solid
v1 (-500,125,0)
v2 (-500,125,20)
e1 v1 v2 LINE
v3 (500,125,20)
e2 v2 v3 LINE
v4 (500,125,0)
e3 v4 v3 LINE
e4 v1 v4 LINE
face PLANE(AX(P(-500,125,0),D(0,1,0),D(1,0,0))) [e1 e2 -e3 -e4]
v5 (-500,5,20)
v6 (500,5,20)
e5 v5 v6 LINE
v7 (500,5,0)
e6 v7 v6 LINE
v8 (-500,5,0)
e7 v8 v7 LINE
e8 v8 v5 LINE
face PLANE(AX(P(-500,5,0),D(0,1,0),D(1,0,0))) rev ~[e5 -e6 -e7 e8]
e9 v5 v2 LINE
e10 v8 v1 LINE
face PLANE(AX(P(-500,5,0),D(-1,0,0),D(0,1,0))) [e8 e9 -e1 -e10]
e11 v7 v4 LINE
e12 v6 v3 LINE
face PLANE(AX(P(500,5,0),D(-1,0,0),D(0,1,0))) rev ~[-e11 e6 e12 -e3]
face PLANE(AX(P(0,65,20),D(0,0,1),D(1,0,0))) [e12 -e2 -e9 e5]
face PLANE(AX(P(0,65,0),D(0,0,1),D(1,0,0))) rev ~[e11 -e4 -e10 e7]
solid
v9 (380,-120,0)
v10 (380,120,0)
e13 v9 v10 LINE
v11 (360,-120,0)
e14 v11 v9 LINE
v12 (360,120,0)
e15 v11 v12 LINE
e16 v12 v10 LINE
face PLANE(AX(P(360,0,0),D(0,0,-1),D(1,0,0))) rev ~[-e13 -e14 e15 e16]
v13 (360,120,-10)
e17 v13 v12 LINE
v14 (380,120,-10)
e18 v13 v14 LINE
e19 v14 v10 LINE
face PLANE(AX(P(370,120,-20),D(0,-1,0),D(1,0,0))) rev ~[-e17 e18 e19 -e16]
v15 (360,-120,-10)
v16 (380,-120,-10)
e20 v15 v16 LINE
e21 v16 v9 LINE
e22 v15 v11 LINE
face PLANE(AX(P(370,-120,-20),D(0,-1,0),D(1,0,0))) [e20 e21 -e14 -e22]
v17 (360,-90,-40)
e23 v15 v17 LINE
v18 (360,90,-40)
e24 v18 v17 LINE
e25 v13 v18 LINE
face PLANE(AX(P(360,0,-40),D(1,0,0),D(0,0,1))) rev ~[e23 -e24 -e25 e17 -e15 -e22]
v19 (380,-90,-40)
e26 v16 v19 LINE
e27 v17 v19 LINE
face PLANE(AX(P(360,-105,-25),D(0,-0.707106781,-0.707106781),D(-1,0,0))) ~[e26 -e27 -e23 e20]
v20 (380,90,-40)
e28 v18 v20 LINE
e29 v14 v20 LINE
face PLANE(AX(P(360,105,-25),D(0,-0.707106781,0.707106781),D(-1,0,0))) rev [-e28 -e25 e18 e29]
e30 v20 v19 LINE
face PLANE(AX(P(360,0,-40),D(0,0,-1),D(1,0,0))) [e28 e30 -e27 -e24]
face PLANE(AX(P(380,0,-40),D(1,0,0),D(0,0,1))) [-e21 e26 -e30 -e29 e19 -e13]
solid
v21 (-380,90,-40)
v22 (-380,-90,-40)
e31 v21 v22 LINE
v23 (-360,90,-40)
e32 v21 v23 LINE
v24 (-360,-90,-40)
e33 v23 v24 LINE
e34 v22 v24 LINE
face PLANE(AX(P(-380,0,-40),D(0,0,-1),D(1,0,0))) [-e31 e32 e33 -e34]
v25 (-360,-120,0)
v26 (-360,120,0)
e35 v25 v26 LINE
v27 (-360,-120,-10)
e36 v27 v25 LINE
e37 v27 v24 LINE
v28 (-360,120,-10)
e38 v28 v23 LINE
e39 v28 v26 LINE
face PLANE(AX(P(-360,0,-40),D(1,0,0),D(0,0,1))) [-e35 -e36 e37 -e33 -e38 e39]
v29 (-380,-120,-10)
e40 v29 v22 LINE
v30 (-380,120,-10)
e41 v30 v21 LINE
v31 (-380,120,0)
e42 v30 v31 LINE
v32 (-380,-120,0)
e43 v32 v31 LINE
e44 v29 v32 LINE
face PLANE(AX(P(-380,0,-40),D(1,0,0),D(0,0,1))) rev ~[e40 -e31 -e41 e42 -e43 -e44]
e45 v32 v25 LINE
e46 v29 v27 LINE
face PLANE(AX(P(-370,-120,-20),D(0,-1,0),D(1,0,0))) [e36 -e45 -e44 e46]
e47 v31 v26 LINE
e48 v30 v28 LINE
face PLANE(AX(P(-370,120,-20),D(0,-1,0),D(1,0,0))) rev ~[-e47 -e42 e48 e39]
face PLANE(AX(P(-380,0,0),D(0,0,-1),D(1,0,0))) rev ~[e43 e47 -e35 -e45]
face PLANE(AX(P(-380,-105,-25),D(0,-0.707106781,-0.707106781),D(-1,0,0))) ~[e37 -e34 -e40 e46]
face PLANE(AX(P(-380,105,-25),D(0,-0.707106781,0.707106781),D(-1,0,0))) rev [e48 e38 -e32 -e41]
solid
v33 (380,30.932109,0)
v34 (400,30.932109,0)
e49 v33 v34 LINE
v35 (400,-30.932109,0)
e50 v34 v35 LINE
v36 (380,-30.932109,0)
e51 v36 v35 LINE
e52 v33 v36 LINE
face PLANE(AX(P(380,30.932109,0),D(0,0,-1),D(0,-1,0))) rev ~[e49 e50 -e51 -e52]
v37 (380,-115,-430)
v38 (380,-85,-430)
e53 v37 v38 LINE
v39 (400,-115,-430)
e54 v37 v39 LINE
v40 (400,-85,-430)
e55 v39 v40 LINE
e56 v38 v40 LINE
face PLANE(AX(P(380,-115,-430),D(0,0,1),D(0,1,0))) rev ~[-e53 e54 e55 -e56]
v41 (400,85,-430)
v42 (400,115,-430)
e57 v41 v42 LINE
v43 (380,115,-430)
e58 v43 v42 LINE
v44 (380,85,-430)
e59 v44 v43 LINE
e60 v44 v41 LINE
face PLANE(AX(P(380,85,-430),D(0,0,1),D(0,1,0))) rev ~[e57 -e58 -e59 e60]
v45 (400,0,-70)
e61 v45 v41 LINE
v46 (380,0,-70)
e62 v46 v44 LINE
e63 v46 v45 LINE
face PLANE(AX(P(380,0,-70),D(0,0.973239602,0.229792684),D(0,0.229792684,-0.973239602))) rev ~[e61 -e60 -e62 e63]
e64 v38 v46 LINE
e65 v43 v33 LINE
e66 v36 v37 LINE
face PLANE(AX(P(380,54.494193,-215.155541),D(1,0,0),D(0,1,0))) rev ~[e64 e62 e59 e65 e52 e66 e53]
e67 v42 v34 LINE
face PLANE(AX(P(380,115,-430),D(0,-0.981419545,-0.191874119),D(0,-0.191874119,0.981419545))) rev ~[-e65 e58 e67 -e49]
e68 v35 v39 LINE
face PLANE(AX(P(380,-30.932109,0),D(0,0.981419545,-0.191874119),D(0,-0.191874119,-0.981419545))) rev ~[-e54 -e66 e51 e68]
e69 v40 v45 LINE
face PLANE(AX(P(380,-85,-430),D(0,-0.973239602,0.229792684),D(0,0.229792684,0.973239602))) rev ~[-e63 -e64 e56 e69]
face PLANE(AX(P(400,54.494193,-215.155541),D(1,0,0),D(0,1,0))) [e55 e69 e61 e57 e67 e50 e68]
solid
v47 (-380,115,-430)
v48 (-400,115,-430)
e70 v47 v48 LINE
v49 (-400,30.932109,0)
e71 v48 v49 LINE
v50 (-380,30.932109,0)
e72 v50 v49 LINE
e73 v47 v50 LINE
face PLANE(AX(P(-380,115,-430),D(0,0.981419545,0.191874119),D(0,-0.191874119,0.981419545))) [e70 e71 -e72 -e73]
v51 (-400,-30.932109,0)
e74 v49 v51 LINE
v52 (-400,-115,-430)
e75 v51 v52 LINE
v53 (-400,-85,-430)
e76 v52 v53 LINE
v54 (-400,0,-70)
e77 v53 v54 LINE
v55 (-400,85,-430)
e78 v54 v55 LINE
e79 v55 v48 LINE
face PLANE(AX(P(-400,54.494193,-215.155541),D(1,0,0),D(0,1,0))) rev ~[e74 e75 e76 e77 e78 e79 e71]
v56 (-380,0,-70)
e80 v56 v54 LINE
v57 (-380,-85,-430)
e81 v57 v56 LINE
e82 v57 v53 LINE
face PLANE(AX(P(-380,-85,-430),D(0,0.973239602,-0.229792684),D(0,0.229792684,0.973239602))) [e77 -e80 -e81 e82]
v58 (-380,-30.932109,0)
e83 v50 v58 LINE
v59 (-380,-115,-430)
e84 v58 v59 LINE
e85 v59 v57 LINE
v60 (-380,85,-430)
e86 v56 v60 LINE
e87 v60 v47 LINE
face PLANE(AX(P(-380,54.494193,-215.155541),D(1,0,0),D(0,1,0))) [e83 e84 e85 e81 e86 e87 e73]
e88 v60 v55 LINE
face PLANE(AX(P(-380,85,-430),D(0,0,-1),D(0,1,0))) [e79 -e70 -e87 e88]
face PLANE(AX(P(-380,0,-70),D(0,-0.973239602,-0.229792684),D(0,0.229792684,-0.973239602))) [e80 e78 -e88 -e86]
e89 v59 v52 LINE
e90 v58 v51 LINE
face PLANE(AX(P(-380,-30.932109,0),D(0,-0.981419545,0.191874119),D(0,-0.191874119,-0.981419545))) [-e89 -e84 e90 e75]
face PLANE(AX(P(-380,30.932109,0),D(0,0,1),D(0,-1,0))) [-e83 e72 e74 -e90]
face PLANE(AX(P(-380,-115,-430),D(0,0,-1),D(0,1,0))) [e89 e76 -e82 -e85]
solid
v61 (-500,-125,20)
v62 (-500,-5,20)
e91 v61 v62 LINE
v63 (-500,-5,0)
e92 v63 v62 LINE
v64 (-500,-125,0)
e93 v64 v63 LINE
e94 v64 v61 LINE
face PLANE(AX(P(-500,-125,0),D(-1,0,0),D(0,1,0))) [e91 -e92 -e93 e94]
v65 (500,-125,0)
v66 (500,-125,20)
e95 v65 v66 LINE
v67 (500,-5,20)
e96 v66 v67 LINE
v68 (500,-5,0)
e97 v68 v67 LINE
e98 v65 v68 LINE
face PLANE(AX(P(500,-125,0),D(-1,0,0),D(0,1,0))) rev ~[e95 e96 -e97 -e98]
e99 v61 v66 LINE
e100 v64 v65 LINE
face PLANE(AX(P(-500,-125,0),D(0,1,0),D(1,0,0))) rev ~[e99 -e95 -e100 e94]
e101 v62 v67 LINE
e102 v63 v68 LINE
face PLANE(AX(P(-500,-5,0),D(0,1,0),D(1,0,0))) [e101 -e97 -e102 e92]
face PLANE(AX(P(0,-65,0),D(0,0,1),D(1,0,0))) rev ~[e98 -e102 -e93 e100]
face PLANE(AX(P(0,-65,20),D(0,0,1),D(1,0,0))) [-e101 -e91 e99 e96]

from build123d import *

# Parameters (mm, degrees)
F0_W      = 1000
F0_H      = 120
F1_DEPTH  = 20
F2_W      = 20
F2_H      = 40
F3_DEPTH  = 120
F5_START  = 380
F5_DEPTH  = 20
F6_START  = -380
F6_DEPTH  = 20
F7_SIZE   = 30
F7_2_SIZE = 30


with BuildPart() as f1:
    # F0 (on Top) → F1 (new body)
    with BuildSketch(Plane.XY):
        with Locations((0, 65)):
            Rectangle(F0_W, F0_H)
    extrude(amount=F1_DEPTH)


with BuildPart() as f1b:
    # F0 (on Top) → F1, piece 2 (new body)
    with BuildSketch(Plane.XY):
        with Locations((0, -65)):
            Rectangle(F0_W, F0_H)
    extrude(amount=F1_DEPTH)


with BuildPart() as f3:
    # F2 (on Front) → F3 (new body, symmetric)
    with BuildSketch(Plane.XZ):
        with Locations((-370, -20)):
            Rectangle(F2_W, F2_H)
    extrude(amount=F3_DEPTH, both=True)

    # F7
    f7_edges = [f3.edges().sort_by_distance(p)[0] for p in [
        (-370, -120, -40),
        (-370, 120, -40),
    ]]
    chamfer(f7_edges, length=F7_SIZE)


with BuildPart() as f3b:
    # F2 (on Front) → F3, piece 2 (new body, symmetric)
    with BuildSketch(Plane.XZ):
        with Locations((370, -20)):
            Rectangle(F2_W, F2_H)
    extrude(amount=F3_DEPTH, both=True)

    # F7#2
    f7_2_edges = [f3b.edges().sort_by_distance(p)[0] for p in [
        (370, -120, -40),
        (370, 120, -40),
    ]]
    chamfer(f7_2_edges, length=F7_2_SIZE)


with BuildPart() as f5:
    # F4 (on Right) → F5 (new body)
    with BuildSketch(Plane.YZ.offset(F5_START)):
        Polygon((30.9321093395, 0), (0, 0), (0, -70), (85, -430), (115, -430), align=None)
        Polygon((0, -70), (0, 0), (-30.9321093395, 0), (-115, -430), (-85, -430), align=None)
    extrude(amount=F5_DEPTH)


with BuildPart() as f6:
    # F4 (on Right) → F6 (new body)
    with BuildSketch(Plane.YZ.offset(F6_START)):
        Polygon((30.9321093395, 0), (0, 0), (0, -70), (85, -430), (115, -430), align=None)
        Polygon((0, -70), (0, 0), (-30.9321093395, 0), (-115, -430), (-85, -430), align=None)
    extrude(amount=-F6_DEPTH)


solid = Compound([f1.part, f1b.part, f3.part, f3b.part, f5.part, f6.part])
